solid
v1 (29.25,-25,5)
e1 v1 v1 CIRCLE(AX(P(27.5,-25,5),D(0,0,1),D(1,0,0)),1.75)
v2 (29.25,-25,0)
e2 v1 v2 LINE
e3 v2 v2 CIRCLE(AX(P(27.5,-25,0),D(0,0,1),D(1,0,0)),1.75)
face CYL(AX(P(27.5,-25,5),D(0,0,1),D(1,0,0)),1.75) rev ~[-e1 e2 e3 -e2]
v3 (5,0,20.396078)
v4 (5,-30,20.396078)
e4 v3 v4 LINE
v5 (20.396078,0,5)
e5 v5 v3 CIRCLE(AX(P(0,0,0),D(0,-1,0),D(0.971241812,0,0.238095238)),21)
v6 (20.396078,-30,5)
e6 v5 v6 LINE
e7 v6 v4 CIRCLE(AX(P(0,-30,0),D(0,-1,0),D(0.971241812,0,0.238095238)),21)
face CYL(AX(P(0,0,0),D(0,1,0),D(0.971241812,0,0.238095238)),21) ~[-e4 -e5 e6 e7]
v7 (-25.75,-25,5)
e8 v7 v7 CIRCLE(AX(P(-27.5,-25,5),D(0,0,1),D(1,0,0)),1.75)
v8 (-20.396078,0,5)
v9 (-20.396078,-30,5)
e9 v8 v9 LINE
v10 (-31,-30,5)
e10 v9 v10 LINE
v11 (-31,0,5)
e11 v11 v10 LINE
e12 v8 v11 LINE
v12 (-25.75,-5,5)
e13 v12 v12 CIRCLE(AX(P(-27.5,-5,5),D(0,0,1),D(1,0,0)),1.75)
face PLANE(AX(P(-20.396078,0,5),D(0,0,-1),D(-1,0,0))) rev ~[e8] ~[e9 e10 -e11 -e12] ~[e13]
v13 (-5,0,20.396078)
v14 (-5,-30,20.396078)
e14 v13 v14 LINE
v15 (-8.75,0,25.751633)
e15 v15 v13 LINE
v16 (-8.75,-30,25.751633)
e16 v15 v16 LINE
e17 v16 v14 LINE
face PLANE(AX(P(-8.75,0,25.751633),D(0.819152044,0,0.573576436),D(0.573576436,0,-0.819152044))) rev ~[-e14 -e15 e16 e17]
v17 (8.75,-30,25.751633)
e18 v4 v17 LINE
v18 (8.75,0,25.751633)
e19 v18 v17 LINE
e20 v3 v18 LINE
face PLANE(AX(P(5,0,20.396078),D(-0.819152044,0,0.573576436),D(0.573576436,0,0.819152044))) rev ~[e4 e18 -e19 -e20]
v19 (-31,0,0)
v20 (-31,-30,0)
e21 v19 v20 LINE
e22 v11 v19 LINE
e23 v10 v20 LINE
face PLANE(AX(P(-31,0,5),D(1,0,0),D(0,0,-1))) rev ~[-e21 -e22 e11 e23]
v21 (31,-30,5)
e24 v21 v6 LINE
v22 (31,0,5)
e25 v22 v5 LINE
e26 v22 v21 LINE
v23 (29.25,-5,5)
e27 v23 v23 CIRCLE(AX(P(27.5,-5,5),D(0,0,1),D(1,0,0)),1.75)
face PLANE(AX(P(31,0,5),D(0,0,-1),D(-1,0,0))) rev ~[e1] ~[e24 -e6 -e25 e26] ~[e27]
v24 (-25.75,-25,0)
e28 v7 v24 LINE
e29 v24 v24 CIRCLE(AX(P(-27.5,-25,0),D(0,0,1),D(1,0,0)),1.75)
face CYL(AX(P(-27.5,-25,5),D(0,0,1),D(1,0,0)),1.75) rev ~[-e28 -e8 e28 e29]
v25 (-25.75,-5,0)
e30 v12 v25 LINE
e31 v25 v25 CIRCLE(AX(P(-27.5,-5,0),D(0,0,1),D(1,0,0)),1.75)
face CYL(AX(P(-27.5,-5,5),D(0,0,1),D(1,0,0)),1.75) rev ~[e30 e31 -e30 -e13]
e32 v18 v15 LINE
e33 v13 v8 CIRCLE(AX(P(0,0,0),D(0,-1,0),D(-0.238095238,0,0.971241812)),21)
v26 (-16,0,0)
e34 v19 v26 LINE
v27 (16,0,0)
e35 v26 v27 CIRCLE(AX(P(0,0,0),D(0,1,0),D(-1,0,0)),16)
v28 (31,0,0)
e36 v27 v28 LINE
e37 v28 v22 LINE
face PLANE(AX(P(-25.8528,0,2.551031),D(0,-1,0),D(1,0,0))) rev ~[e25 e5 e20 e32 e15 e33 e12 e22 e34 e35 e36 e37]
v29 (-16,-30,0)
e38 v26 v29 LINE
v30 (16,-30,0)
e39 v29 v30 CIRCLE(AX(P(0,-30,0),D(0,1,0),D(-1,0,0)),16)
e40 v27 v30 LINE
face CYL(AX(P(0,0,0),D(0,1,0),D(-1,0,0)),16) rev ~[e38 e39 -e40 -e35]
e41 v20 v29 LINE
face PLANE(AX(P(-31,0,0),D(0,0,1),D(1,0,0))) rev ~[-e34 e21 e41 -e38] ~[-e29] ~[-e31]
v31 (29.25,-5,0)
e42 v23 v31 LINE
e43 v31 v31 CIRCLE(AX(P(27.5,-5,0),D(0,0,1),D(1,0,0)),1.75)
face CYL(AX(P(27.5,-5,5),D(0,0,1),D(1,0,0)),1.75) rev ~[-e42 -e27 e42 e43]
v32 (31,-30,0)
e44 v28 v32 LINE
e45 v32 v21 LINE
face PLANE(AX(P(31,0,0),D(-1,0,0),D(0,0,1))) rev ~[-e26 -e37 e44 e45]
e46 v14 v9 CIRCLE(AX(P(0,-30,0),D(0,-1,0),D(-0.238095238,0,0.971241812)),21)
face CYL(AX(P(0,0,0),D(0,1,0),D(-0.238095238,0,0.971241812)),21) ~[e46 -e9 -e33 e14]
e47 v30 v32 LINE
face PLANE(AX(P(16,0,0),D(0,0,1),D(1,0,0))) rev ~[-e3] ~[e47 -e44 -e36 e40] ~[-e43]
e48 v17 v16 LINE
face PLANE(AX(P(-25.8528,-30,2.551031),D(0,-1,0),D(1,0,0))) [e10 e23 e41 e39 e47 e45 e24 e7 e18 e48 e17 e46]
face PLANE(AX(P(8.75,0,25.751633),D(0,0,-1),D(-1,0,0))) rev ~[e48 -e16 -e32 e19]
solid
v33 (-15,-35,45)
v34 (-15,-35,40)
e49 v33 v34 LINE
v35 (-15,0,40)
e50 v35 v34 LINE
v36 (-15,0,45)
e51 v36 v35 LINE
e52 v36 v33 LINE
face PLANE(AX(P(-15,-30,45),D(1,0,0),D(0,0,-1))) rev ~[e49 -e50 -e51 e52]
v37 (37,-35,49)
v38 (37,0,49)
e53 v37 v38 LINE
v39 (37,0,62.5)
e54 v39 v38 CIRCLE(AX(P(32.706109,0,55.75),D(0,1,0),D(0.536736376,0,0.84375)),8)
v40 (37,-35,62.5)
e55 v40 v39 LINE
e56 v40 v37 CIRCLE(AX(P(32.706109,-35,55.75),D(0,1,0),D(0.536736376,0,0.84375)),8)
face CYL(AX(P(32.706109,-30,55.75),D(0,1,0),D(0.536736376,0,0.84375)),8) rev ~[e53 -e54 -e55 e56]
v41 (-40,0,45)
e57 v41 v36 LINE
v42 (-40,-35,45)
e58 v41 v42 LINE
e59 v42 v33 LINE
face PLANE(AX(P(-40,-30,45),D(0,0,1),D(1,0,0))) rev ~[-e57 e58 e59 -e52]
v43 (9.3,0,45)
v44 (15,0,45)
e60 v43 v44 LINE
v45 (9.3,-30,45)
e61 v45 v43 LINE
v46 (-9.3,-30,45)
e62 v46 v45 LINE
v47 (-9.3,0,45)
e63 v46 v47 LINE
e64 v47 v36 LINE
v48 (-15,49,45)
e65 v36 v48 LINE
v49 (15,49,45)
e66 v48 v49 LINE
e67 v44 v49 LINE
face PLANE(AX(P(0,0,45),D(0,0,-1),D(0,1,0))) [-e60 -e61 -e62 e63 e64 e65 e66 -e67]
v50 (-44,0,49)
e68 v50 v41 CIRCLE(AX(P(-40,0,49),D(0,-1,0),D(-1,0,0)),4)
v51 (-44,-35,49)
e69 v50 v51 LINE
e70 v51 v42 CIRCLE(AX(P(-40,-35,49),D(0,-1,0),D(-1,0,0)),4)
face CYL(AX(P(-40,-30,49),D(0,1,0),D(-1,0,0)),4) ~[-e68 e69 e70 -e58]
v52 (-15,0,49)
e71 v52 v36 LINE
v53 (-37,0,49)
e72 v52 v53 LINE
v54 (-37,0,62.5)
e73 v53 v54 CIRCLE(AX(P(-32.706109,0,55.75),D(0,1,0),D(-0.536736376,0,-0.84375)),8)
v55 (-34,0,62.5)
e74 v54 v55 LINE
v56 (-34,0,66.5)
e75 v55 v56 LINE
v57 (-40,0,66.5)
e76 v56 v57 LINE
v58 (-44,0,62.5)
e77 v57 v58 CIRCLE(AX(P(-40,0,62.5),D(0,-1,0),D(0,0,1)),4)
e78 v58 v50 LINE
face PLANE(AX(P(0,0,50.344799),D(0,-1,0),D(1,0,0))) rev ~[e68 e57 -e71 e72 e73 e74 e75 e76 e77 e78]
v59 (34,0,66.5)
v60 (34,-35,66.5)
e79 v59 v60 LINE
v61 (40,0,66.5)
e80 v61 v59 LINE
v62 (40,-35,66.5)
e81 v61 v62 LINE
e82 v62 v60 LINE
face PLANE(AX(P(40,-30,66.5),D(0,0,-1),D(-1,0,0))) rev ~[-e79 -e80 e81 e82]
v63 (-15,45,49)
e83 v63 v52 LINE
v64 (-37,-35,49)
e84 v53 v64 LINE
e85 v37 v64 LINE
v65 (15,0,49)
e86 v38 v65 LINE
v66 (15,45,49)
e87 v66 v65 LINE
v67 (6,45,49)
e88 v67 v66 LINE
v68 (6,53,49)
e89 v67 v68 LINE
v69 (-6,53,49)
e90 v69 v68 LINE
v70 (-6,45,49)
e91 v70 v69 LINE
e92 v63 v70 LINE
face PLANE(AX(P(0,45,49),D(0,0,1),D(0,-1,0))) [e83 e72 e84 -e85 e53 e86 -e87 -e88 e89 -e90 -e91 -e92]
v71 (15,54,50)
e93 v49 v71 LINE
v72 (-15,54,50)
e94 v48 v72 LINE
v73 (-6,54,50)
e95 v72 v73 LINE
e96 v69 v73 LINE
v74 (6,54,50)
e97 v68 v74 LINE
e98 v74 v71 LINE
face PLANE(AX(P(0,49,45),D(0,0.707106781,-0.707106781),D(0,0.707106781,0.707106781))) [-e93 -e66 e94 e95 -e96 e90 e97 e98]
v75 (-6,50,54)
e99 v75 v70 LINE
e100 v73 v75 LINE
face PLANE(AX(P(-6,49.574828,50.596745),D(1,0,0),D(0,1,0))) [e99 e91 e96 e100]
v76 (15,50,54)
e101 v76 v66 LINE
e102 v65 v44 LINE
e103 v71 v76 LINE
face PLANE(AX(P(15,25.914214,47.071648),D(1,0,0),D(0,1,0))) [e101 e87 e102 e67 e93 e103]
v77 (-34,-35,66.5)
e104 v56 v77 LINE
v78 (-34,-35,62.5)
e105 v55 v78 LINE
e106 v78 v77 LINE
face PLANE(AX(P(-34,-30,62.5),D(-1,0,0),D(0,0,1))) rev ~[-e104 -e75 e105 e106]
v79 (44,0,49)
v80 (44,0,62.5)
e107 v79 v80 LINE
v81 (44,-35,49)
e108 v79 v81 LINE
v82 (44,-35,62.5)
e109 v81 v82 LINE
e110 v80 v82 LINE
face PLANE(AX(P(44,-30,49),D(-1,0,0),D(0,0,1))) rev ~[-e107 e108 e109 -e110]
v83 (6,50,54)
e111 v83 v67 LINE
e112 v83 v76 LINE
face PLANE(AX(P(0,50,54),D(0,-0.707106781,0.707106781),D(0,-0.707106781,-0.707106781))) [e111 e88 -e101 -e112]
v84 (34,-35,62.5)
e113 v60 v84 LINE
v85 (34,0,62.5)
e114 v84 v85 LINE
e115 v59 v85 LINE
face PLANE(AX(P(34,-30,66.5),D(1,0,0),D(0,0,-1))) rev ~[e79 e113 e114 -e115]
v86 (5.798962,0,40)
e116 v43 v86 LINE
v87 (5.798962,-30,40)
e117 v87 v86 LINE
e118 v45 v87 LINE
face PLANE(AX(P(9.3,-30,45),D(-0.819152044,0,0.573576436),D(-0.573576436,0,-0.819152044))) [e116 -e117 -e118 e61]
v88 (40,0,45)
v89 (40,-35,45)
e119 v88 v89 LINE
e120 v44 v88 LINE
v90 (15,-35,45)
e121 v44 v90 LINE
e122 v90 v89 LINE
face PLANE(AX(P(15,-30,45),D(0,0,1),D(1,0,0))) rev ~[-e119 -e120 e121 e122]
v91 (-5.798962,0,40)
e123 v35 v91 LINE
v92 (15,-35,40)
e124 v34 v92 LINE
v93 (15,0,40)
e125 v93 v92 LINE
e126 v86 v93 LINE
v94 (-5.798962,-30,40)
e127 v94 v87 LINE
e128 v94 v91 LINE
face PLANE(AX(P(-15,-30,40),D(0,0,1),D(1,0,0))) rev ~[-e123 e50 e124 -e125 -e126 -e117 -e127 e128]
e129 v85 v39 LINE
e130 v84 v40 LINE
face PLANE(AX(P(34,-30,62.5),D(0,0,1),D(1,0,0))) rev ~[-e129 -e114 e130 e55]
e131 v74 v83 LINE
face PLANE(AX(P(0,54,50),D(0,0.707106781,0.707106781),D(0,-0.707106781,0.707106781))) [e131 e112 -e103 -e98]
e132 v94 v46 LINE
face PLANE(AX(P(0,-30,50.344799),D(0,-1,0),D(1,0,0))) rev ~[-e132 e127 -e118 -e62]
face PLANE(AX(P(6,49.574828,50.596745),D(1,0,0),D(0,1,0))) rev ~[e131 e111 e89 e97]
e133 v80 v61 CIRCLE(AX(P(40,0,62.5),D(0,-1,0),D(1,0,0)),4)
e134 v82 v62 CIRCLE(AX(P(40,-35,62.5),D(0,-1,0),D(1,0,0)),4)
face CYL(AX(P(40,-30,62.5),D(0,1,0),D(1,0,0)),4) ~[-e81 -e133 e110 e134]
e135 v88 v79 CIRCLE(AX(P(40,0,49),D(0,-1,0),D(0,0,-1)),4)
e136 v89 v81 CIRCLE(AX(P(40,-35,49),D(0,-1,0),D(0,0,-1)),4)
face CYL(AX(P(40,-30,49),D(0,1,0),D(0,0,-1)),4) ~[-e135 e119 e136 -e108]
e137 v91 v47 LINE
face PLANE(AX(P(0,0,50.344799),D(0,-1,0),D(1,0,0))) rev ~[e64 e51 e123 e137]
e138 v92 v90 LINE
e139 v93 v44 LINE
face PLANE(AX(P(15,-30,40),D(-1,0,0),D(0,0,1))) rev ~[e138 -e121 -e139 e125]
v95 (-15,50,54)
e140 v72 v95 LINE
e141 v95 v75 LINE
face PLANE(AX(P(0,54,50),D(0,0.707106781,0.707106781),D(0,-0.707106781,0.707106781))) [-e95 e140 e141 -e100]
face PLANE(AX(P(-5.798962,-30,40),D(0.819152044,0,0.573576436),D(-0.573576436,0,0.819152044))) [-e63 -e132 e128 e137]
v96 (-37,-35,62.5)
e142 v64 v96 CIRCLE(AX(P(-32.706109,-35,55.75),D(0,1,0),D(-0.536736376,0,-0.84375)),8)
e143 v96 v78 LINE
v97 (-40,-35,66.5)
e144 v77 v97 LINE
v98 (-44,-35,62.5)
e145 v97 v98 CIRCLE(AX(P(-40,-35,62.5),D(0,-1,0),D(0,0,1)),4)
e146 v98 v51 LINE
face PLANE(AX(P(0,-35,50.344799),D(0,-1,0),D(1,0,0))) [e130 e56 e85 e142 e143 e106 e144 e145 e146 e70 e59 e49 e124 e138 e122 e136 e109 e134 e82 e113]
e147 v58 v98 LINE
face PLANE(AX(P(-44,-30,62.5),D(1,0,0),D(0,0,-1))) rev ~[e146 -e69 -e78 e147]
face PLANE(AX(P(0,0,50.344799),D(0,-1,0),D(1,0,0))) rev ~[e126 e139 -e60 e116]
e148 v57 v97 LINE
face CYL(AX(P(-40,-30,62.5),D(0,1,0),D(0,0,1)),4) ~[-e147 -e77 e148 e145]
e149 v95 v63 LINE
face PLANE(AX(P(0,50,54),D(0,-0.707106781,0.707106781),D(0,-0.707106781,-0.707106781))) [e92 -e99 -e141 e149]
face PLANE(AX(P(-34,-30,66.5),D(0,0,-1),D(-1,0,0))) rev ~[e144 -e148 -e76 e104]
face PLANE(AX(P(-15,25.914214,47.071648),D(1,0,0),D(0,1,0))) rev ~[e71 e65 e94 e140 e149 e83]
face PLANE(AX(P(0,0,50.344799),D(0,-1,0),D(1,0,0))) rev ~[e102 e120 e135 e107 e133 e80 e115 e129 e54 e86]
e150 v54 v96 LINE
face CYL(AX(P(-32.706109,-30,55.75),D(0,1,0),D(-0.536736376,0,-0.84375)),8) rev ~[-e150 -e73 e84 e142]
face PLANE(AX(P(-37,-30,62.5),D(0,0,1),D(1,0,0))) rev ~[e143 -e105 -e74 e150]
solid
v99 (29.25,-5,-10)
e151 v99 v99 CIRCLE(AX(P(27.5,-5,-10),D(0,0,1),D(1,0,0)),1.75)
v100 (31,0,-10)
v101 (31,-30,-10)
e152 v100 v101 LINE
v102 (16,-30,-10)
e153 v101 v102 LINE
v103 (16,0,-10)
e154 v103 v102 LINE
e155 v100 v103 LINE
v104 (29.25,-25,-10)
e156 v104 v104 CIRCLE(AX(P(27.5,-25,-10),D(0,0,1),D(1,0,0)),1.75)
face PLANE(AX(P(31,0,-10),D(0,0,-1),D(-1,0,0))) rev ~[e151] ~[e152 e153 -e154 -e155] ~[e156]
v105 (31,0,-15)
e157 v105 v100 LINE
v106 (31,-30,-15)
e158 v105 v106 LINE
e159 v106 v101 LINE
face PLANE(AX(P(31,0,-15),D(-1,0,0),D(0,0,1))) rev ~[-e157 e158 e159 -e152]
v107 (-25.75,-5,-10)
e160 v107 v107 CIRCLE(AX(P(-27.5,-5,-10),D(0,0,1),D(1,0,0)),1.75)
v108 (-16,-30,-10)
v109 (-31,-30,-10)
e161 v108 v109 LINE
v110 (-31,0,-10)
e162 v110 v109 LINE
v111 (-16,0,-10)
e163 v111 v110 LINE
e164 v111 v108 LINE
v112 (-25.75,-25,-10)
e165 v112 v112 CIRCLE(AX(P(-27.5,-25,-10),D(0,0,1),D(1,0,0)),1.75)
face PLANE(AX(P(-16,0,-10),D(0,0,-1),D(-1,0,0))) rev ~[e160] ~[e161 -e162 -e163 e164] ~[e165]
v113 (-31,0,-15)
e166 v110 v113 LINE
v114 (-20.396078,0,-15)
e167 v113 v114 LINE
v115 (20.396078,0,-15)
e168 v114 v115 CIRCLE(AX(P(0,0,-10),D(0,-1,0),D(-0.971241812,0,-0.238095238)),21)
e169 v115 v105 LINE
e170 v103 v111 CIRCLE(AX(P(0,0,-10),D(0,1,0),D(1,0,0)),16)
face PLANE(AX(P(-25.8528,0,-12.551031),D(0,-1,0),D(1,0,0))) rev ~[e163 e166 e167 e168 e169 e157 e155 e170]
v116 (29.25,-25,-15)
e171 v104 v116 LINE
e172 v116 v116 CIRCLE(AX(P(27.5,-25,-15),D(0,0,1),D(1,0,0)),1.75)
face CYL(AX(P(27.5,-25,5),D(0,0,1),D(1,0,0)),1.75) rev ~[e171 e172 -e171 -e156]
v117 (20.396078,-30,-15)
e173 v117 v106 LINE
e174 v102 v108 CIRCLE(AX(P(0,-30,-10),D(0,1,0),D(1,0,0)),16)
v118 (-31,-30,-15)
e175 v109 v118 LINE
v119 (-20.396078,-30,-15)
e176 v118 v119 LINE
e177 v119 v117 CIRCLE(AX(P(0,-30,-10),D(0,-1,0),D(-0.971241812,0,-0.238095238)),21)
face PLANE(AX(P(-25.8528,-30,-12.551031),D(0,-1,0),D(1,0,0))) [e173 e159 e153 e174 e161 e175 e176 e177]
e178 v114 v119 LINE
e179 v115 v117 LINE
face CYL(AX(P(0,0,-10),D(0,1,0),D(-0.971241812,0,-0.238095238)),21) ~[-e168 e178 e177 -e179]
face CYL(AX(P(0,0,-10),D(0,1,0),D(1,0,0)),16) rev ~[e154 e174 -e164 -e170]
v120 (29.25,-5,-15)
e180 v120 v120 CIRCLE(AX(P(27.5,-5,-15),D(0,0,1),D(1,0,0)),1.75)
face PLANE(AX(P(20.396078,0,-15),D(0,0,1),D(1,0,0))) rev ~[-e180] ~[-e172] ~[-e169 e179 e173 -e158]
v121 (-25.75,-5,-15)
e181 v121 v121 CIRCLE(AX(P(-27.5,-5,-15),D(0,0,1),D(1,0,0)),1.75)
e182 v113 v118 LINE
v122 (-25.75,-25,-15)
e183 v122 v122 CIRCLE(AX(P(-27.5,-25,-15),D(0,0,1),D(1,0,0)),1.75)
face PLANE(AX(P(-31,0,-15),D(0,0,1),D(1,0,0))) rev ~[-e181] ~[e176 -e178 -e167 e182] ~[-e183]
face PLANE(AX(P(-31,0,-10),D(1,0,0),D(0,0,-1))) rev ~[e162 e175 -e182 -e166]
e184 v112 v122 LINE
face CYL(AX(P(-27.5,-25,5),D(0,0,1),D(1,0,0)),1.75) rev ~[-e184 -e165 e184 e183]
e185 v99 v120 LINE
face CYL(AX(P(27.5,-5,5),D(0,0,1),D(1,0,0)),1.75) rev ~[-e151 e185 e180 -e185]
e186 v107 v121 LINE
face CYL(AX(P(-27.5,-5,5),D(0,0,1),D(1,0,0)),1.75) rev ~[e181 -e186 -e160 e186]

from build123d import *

# Parameters (mm, degrees)
F3_DEPTH      = 30
F4_DEPTH      = 5
F6_DEPTH      = 15
F6_DEPTH_BACK = 15
F7_DEPTH      = 6
F8_DEPTH      = 30
F9_DEPTH      = 30
F10_R         = 1.75
F11_DEPTH     = 50


# Not quite as in the source:
# - a feature names something its author has since deleted; it is built from what else it names


with BuildPart() as f3:
    # F2 (on offset) → F3 (new body)
    with BuildSketch(Plane.XZ.offset(30)):
        with BuildLine():
            Line((37, 49), (-37, 49))
            ThreePointArc((-37, 49), (-40.7061089907, 55.75), (-37, 62.5))
            Line((-37, 62.5), (-34, 62.5))
            Line((-34, 62.5), (-34, 66.5))
            Line((-34, 66.5), (-40, 66.5))
            ThreePointArc((-40, 66.5), (-42.8284271247, 65.3284271247), (-44, 62.5))
            Line((-44, 62.5), (-44, 49))
            ThreePointArc((-44, 49), (-42.8284271247, 46.1715728753), (-40, 45))
            Line((-40, 45), (-15, 45))
            Line((-15, 45), (-15, 40))
            Line((-15, 40), (-5.798962309, 40))
            Line((-5.798962309, 40), (-9.3, 45))
            Line((-9.3, 45), (9.3, 45))
            Line((9.3, 45), (5.798962309, 40))
            Line((5.798962309, 40), (15, 40))
            Line((15, 40), (15, 45))
            Line((15, 45), (40, 45))
            ThreePointArc((40, 45), (42.8284271247, 46.1715728753), (44, 49))
            Line((44, 49), (44, 62.5))
            ThreePointArc((44, 62.5), (42.8284271247, 65.3284271247), (40, 66.5))
            Line((40, 66.5), (34, 66.5))
            Line((34, 66.5), (34, 62.5))
            Line((34, 62.5), (37, 62.5))
            ThreePointArc((37, 62.5), (40.7061089907, 55.75), (37, 49))
        make_face()
    extrude(amount=-F3_DEPTH)

    # F2 (on offset) → F4 (join)
    with BuildSketch(Plane.XZ.offset(30)):
        with BuildLine():
            Line((37, 49), (-37, 49))
            ThreePointArc((-37, 49), (-40.7061089907, 55.75), (-37, 62.5))
            Line((-37, 62.5), (-34, 62.5))
            Line((-34, 62.5), (-34, 66.5))
            Line((-34, 66.5), (-40, 66.5))
            ThreePointArc((-40, 66.5), (-42.8284271247, 65.3284271247), (-44, 62.5))
            Line((-44, 62.5), (-44, 49))
            ThreePointArc((-44, 49), (-42.8284271247, 46.1715728753), (-40, 45))
            Line((-40, 45), (-15, 45))
            Line((-15, 45), (-15, 40))
            Line((-15, 40), (-5.798962309, 40))
            Line((-5.798962309, 40), (-9.3, 45))
            Line((-9.3, 45), (9.3, 45))
            Line((9.3, 45), (5.798962309, 40))
            Line((5.798962309, 40), (15, 40))
            Line((15, 40), (15, 45))
            Line((15, 45), (40, 45))
            ThreePointArc((40, 45), (42.8284271247, 46.1715728753), (44, 49))
            Line((44, 49), (44, 62.5))
            ThreePointArc((44, 62.5), (42.8284271247, 65.3284271247), (40, 66.5))
            Line((40, 66.5), (34, 66.5))
            Line((34, 66.5), (34, 62.5))
            Line((34, 62.5), (37, 62.5))
            ThreePointArc((37, 62.5), (40.7061089907, 55.75), (37, 49))
        make_face()
        Polygon((-9.3, 45), (-5.798962309, 40), (5.798962309, 40), (9.3, 45), align=None)
    extrude(amount=F4_DEPTH)

    # F5 (on Right) → F6 (join, two sides)
    with BuildSketch(Plane.YZ) as f6_sk:
        Polygon((45, 49), (0, 49), (0, 45), (49, 45), (53, 49), align=None)
        Polygon((50, 54), (45, 49), (53, 49), (54, 50), align=None)
    extrude(amount=F6_DEPTH)
    extrude(f6_sk.sketch, amount=-F6_DEPTH_BACK)

    # F5 (on Right) → F7 (cut, symmetric)
    with BuildSketch(Plane.YZ):
        Polygon((50, 54), (45, 49), (53, 49), (54, 50), align=None)
    extrude(amount=F7_DEPTH, both=True, mode=Mode.SUBTRACT)


with BuildPart() as f8:
    # F0 (on Front) → F8 (new body)
    with BuildSketch(Plane.XZ):
        with BuildLine():
            Line((-31, 0), (-21, 0))
            ThreePointArc((-21, 0), (-20.8484728355, 2.5181700556), (-20.3960780544, 5))
            Line((-20.3960780544, 5), (-31, 5))
            Line((-31, 5), (-31, 0))
        make_face()
        with BuildLine():
            Line((-21, 0), (-16, 0))
            Line((-16, 0), (-16, 5))
            Line((-16, 5), (-20.3960780544, 5))
            ThreePointArc((-20.3960780544, 5), (-20.8484728355, 2.5181700556), (-21, 0))
        make_face()
        with BuildLine():
            ThreePointArc((-16, 0), (0, 16), (16, 0))
            Line((16, 0), (16, 5))
            Line((16, 5), (20.3960780544, 5))
            ThreePointArc((20.3960780544, 5), (14.8492424049, 14.8492424049), (5, 20.3960780544))
            ThreePointArc((5, 20.3960780544), (0, 21), (-5, 20.3960780544))
            ThreePointArc((-5, 20.3960780544), (-14.8492424049, 14.8492424049), (-20.3960780544, 5))
            Line((-20.3960780544, 5), (-16, 5))
            Line((-16, 5), (-16, 0))
        make_face()
        with BuildLine():
            Line((16, 5), (16, 0))
            Line((16, 0), (21, 0))
            ThreePointArc((21, 0), (20.8484728355, 2.5181700556), (20.3960780544, 5))
            Line((20.3960780544, 5), (16, 5))
        make_face()
        with BuildLine():
            ThreePointArc((20.3960780544, 5), (20.8484728355, 2.5181700556), (21, 0))
            Line((21, 0), (31, 0))
            Line((31, 0), (31, 5))
            Line((31, 5), (20.3960780544, 5))
        make_face()
        with BuildLine():
            ThreePointArc((-5, 20.3960780544), (0, 21), (5, 20.3960780544))
            Line((5, 20.3960780544), (8.75, 25.7516330797))
            Line((8.75, 25.7516330797), (-8.75, 25.7516330797))
            Line((-8.75, 25.7516330797), (-5, 20.3960780544))
        make_face()
    extrude(amount=F8_DEPTH)


with BuildPart() as f9:
    # F0 (on Front) → F9 (new body)
    with BuildSketch(Plane.XZ):
        with BuildLine():
            ThreePointArc((-20.3960780544, -15), (-20.8484728355, -12.5181700556), (-21, -10))
            Line((-21, -10), (-31, -10))
            Line((-31, -10), (-31, -15))
            Line((-31, -15), (-20.3960780544, -15))
        make_face()
        with BuildLine():
            Line((-16, -15), (-16, -10))
            Line((-16, -10), (-21, -10))
            ThreePointArc((-21, -10), (-20.8484728355, -12.5181700556), (-20.3960780544, -15))
            Line((-20.3960780544, -15), (-16, -15))
        make_face()
        with BuildLine():
            ThreePointArc((16, -10), (0, -26), (-16, -10))
            Line((-16, -10), (-16, -15))
            Line((-16, -15), (-20.3960780544, -15))
            ThreePointArc((-20.3960780544, -15), (0, -31), (20.3960780544, -15))
            Line((20.3960780544, -15), (16, -15))
            Line((16, -15), (16, -10))
        make_face()
        with BuildLine():
            Line((21, -10), (16, -10))
            Line((16, -10), (16, -15))
            Line((16, -15), (20.3960780544, -15))
            ThreePointArc((20.3960780544, -15), (20.8484728355, -12.5181700556), (21, -10))
        make_face()
        with BuildLine():
            Line((31, -10), (21, -10))
            ThreePointArc((21, -10), (20.8484728355, -12.5181700556), (20.3960780544, -15))
            Line((20.3960780544, -15), (31, -15))
            Line((31, -15), (31, -10))
        make_face()
    extrude(amount=F9_DEPTH)


with BuildPart() as f11_tool:
    # F10 (on face) → F11 (new body)
    with BuildSketch(Plane.XY.offset(5)):
        with Locations((-27.5, -25)):
            Circle(F10_R)
        with Locations((-27.5, -5)):
            Circle(F10_R)
        with Locations((27.5, -5)):
            Circle(F10_R)
        with Locations((27.5, -25)):
            Circle(F10_R)
    extrude(amount=-F11_DEPTH)


with BuildPart() as f8_1:
    add(f8.part)

    # F11: cut by f11_tool
    add(f11_tool.part, mode=Mode.SUBTRACT)


with BuildPart() as f9_1:
    add(f9.part)

    # F11: cut by f11_tool
    add(f11_tool.part, mode=Mode.SUBTRACT)


solid = Compound([f3.part, f8_1.part, f9_1.part])
